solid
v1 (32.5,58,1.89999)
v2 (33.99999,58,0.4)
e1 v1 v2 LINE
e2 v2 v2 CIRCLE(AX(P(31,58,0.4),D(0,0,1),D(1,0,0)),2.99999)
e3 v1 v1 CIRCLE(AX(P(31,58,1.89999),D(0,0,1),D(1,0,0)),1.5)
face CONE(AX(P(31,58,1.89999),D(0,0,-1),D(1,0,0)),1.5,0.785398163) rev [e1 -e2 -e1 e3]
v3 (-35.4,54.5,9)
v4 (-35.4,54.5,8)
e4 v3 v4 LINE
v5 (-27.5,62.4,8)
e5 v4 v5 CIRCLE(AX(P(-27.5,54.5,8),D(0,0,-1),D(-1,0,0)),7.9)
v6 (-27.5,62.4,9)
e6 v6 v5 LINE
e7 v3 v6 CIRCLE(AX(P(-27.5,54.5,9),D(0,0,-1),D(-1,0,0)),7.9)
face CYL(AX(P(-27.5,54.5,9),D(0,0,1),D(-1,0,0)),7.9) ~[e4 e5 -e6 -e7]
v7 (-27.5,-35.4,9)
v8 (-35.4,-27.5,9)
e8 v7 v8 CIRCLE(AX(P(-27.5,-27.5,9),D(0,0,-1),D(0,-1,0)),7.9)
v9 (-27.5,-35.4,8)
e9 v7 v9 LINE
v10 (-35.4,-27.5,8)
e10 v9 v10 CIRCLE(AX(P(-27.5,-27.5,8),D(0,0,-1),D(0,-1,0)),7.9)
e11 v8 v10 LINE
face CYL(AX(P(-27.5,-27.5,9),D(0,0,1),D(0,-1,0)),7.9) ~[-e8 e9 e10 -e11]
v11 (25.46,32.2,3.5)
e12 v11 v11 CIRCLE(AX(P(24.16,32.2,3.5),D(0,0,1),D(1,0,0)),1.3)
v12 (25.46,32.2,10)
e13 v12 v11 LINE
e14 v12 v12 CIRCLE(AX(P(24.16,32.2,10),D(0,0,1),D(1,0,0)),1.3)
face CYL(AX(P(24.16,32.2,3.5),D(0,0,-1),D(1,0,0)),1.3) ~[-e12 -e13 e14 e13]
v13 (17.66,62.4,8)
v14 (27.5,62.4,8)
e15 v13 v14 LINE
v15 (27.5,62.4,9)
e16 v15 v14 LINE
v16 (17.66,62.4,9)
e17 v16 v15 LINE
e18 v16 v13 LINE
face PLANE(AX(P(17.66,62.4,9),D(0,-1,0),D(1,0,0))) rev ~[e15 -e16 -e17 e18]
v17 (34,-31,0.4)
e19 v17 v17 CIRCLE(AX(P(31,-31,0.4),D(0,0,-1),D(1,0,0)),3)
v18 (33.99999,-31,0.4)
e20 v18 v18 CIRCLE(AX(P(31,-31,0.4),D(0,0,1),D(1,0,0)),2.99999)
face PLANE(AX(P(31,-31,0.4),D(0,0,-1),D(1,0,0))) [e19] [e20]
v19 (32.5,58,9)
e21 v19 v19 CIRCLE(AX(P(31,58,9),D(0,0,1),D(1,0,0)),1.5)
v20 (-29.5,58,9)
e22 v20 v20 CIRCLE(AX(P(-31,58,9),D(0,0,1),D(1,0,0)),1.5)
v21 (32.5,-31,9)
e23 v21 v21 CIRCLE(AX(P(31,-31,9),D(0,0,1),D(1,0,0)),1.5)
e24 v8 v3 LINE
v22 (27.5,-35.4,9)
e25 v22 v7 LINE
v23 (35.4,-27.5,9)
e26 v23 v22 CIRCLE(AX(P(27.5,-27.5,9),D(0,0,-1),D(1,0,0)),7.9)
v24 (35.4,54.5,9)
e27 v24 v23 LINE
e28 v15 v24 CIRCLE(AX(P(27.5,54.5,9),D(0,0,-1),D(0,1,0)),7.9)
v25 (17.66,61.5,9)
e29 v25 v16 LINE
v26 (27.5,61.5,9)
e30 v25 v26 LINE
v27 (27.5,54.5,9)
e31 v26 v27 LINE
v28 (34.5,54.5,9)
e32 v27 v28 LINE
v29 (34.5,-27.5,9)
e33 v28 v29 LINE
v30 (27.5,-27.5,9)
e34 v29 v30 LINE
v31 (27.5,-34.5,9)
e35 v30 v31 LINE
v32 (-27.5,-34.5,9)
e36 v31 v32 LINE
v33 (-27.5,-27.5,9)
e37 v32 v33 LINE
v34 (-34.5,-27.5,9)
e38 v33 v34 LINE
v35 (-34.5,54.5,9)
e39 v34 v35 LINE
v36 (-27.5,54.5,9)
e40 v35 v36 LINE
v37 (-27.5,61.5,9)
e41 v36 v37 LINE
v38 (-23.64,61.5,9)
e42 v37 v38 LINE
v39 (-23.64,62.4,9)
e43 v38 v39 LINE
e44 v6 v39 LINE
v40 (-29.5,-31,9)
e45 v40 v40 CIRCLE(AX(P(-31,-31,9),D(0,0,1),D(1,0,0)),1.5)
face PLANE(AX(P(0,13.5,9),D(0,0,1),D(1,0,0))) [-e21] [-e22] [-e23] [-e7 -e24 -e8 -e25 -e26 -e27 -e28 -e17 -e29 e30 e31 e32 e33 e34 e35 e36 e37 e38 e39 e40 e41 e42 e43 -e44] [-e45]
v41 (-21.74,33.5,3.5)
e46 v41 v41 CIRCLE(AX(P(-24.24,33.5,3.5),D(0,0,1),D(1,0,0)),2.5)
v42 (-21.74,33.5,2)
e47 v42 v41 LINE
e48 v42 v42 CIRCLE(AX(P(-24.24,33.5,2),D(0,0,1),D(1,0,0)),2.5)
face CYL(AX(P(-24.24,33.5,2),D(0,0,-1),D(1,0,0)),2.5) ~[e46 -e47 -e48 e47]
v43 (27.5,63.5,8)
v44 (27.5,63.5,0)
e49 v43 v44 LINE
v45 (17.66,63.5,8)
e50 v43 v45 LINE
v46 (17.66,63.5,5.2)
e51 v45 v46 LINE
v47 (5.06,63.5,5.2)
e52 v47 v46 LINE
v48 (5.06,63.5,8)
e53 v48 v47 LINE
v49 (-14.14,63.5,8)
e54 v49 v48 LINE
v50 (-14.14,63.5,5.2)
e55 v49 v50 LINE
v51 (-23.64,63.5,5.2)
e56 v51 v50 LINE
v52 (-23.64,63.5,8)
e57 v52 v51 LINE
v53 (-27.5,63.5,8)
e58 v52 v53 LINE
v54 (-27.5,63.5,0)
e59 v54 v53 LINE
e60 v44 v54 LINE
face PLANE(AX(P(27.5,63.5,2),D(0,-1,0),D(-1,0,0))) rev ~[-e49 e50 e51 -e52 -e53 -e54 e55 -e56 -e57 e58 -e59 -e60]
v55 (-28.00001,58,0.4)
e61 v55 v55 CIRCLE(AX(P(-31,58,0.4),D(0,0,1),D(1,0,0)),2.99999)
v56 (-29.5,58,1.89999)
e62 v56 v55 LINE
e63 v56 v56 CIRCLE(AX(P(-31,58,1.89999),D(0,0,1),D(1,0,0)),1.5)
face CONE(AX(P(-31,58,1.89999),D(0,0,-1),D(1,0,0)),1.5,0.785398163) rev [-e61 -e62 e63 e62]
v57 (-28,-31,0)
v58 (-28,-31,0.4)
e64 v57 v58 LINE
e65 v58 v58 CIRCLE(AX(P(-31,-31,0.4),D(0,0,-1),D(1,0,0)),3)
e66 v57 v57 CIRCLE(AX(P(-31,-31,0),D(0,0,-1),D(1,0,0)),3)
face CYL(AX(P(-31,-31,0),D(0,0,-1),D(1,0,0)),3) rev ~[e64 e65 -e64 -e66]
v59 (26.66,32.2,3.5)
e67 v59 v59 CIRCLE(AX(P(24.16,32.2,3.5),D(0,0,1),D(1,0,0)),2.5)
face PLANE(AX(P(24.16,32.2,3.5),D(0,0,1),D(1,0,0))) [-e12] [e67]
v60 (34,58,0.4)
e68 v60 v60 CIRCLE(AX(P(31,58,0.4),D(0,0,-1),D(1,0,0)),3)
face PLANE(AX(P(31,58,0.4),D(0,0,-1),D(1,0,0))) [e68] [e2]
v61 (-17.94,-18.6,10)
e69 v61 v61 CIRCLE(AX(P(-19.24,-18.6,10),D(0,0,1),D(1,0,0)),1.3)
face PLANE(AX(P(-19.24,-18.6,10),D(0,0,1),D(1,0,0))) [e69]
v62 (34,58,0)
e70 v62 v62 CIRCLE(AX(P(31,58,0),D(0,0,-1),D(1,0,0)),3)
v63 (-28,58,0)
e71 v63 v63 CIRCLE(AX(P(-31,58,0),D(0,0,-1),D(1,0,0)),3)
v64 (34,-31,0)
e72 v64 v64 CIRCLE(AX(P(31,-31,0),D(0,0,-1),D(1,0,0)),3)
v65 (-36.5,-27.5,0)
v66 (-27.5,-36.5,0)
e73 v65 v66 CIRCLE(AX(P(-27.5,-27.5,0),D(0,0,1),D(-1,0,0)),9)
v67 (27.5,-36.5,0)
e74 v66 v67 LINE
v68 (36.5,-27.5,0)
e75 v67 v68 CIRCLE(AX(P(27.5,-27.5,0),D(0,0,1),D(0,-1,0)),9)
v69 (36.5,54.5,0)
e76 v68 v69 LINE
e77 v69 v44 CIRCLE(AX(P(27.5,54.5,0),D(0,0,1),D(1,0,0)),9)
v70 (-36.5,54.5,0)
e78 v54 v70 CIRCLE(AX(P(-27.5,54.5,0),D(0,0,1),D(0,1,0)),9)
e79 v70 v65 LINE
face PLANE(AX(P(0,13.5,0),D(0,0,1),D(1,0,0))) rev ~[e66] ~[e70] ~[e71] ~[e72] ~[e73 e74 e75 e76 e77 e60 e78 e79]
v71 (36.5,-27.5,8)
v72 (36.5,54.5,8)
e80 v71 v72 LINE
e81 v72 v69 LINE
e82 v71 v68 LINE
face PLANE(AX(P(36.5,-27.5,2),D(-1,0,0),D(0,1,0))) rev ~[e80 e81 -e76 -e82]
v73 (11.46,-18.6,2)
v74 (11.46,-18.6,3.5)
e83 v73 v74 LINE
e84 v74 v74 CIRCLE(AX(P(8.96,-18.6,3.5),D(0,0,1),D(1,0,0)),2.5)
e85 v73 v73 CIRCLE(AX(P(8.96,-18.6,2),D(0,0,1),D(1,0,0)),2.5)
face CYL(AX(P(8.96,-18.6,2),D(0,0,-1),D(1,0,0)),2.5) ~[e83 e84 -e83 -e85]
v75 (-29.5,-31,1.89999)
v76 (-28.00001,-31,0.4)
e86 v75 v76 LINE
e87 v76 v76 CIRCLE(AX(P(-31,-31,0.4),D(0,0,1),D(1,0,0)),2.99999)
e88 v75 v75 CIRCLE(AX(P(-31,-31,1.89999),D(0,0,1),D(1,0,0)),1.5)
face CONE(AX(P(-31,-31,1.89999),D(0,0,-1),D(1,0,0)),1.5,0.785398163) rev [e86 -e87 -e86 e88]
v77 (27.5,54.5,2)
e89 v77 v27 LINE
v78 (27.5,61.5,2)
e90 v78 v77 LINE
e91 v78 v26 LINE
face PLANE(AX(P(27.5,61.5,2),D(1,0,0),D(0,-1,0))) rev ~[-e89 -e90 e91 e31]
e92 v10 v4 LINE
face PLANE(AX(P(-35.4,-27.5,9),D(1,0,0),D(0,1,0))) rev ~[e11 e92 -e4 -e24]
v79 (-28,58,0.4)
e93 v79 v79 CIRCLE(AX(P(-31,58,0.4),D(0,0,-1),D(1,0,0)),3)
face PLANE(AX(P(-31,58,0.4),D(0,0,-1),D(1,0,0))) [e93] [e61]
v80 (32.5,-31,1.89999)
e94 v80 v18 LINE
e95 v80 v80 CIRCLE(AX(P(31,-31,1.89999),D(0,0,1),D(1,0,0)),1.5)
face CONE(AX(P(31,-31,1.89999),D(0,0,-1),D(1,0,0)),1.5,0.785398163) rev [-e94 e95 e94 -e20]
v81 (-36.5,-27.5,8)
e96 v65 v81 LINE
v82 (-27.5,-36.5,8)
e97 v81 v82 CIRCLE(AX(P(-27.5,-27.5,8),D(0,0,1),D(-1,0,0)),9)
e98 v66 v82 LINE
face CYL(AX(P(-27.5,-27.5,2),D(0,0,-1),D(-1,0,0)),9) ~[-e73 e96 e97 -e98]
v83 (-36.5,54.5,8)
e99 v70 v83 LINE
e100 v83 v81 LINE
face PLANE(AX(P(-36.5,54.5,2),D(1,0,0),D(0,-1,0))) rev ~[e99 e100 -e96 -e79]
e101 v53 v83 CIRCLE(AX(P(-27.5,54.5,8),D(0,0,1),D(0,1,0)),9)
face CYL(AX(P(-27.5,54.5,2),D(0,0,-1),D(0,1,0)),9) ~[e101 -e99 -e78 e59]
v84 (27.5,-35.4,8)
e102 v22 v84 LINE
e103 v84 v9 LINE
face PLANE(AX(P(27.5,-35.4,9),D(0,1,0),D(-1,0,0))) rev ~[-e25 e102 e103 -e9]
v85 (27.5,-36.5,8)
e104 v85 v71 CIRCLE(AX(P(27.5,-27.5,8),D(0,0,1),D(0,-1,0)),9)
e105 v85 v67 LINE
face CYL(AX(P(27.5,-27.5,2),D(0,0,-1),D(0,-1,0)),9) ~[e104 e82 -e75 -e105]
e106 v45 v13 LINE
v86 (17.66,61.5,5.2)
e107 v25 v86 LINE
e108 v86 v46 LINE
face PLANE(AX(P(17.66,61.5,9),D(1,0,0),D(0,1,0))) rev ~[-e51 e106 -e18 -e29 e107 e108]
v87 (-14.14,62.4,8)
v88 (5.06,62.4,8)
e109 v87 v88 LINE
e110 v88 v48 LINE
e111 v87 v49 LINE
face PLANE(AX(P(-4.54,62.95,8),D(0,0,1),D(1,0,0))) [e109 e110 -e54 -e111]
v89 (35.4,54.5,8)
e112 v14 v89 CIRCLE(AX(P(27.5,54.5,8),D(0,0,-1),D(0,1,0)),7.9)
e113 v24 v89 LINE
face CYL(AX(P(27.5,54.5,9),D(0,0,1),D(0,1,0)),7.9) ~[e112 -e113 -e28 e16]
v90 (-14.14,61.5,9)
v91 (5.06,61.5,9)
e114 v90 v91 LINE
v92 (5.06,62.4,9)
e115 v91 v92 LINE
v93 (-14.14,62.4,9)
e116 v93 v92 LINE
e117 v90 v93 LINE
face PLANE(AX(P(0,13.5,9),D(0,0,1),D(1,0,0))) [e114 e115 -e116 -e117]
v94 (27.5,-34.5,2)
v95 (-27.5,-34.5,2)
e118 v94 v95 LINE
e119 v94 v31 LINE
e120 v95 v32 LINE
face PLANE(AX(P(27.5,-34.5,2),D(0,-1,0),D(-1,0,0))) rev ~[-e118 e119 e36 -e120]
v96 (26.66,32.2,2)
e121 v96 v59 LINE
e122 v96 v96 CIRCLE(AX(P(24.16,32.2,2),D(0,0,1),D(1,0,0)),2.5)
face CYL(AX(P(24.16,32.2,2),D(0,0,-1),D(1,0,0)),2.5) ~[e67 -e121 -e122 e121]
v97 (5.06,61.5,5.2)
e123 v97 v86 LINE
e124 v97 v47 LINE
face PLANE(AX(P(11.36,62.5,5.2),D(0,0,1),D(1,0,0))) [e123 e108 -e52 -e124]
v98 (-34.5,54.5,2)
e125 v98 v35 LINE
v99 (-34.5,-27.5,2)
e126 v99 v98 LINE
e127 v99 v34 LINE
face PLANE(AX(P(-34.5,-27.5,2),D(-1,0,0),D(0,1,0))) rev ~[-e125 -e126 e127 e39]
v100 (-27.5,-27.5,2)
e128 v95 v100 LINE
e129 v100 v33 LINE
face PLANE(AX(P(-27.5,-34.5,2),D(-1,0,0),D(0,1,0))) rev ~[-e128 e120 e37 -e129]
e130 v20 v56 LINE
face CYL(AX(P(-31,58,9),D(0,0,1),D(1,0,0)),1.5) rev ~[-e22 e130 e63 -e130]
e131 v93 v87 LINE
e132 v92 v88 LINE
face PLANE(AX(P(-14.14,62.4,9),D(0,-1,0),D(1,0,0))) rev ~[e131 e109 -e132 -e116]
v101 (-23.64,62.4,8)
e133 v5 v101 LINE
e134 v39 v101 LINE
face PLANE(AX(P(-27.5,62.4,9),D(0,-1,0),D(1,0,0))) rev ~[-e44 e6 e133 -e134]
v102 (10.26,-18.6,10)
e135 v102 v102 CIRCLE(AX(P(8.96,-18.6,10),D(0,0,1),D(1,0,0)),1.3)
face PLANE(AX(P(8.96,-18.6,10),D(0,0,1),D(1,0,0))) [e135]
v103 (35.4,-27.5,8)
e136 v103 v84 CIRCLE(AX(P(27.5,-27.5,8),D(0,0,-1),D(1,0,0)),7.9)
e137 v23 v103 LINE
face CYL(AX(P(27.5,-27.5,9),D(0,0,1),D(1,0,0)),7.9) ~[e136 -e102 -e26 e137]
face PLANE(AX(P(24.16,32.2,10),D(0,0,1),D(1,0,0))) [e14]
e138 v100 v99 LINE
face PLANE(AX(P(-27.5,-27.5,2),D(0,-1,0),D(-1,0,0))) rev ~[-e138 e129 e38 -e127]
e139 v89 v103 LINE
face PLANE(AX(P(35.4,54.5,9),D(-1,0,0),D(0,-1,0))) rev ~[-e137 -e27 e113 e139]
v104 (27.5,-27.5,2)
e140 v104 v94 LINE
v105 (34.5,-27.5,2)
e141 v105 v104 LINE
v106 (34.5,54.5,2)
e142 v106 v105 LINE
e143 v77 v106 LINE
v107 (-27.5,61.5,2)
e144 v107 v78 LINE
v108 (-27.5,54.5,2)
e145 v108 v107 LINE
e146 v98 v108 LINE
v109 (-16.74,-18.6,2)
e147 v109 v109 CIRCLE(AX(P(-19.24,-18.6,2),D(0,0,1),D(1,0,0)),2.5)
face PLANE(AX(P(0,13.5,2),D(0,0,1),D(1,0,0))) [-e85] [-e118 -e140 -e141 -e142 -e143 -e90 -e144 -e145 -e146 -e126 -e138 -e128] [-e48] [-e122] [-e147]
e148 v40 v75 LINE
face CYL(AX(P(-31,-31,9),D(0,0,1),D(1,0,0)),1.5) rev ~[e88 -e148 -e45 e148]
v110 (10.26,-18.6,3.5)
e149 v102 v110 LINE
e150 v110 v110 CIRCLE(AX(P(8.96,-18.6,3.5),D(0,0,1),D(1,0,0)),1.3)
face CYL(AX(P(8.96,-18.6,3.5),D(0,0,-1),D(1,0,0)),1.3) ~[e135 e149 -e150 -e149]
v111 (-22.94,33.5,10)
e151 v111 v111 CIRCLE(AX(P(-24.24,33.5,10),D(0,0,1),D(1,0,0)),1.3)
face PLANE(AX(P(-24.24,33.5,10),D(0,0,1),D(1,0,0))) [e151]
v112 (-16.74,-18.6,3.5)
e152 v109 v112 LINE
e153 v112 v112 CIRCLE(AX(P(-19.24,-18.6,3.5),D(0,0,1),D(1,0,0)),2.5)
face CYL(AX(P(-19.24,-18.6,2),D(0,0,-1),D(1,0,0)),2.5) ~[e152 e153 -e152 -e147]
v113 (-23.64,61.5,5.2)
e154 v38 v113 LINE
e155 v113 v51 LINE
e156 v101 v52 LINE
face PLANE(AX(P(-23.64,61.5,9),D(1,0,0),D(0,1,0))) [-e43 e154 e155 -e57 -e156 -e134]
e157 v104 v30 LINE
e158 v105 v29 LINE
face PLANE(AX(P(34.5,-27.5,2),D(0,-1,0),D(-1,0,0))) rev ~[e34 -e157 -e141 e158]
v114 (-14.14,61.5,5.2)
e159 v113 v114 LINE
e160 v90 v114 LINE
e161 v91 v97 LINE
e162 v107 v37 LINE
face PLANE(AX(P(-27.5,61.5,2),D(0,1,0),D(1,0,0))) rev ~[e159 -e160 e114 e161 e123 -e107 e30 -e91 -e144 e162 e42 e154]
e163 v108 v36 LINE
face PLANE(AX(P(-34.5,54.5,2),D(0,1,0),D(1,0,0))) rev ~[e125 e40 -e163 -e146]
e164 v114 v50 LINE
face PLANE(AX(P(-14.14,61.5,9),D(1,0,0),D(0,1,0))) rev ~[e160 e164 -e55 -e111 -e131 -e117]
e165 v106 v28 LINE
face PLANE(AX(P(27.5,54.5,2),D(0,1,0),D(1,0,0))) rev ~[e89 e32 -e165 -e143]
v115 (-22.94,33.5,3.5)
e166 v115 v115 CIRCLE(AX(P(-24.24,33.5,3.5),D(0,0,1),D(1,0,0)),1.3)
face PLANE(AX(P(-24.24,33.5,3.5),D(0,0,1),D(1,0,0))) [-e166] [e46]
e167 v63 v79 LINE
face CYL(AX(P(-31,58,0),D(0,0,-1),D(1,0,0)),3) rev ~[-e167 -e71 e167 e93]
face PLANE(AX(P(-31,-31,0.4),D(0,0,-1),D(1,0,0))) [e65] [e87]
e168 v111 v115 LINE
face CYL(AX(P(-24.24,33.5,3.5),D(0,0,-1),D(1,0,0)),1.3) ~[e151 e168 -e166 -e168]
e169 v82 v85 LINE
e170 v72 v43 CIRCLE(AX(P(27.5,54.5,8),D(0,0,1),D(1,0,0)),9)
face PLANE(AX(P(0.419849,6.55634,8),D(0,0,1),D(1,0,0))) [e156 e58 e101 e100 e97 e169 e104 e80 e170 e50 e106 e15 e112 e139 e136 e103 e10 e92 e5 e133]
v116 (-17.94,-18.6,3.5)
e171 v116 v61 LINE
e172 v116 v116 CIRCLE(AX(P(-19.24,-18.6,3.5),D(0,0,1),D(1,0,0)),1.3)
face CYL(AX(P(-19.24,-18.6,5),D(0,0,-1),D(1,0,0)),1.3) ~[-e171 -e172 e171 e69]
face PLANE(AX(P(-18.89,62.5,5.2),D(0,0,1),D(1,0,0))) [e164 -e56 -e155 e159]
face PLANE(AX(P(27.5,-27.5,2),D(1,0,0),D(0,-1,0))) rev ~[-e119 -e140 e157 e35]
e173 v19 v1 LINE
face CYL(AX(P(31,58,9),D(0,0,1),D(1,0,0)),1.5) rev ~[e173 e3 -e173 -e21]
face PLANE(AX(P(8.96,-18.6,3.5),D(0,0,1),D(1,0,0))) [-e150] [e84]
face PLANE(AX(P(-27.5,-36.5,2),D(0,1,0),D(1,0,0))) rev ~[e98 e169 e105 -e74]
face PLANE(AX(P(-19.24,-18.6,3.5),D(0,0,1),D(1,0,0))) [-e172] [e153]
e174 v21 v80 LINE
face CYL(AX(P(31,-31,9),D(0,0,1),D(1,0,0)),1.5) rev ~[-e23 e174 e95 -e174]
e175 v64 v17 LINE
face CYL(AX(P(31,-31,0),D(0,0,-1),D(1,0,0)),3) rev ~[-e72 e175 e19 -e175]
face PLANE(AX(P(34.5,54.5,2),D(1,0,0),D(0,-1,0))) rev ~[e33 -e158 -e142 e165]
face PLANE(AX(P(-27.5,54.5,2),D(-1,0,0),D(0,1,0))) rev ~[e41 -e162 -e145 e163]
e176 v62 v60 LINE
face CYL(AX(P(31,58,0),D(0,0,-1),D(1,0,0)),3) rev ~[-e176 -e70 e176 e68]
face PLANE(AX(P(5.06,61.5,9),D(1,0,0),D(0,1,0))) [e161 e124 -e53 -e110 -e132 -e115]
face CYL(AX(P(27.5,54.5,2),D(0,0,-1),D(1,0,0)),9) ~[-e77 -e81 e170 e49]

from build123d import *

# Parameters (mm, degrees)
F1_DEPTH  = 2
F2_R      = 2.5
F3_DEPTH  = 1.5
F4_R      = 1.3
F5_DEPTH  = 1.5
F7_DEPTH  = 7
F8_R      = 1.5
F9_DEPTH  = 10
F10_W     = 12.6
F10_H     = 2
F10_W_2   = 9.5
F11_DEPTH = 3.8
F12_R     = 3
F13_DEPTH = 0.4
F14_SIZE  = 1.49999
F15_W     = 19.2
F15_H     = 1.1
F16_DEPTH = 1
F17_DEPTH = 5


# Not quite as in the source:
# - a fillet or chamfer is up to 0.001 mm smaller than in the source, because OpenCascade refuses the exact size


with BuildPart() as f1:
    # F0 (on Top) → F1 (new body)
    with BuildSketch(Plane.XY):
        with BuildLine():
            Line((27.5, 63.5), (-27.5, 63.5))
            ThreePointArc((-27.5, 63.5), (-33.8639610307, 60.8639610307), (-36.5, 54.5))
            Line((-36.5, 54.5), (-36.5, -27.5))
            ThreePointArc((-36.5, -27.5), (-33.8639610307, -33.8639610307), (-27.5, -36.5))
            Line((-27.5, -36.5), (27.5, -36.5))
            ThreePointArc((27.5, -36.5), (33.8639610307, -33.8639610307), (36.5, -27.5))
            Line((36.5, -27.5), (36.5, 54.5))
            ThreePointArc((36.5, 54.5), (33.8639610307, 60.8639610307), (27.5, 63.5))
        make_face()
    extrude(amount=F1_DEPTH)

    # F2 (on face) → F3 (join)
    with BuildSketch(Plane.XY.offset(2)):
        with Locations((-19.24, -18.6)):
            Circle(F2_R)
        with Locations((8.96, -18.6)):
            Circle(F2_R)
        with Locations((24.16, 32.2)):
            Circle(F2_R)
        with Locations((-24.24, 33.5)):
            Circle(F2_R)
    extrude(amount=F3_DEPTH)

    # F4 (on face) → F5 (join)
    with BuildSketch(Plane.XY.offset(3.5)):
        with Locations((-19.24, -18.6)):
            Circle(F4_R)
        with Locations((8.96, -18.6)):
            Circle(F4_R)
        with Locations((24.16, 32.2)):
            Circle(F4_R)
        with Locations((-24.24, 33.5)):
            Circle(F4_R)
    extrude(amount=F5_DEPTH)

    # F6 (on face) → F7 (join)
    with BuildSketch(Plane.XY.offset(2)):
        with BuildLine():
            Line((27.5, 63.5), (-27.5, 63.5))
            ThreePointArc((-27.5, 63.5), (-33.8639610307, 60.8639610307), (-36.5, 54.5))
            Line((-36.5, 54.5), (-36.5, -27.5))
            ThreePointArc((-36.5, -27.5), (-33.8639610307, -33.8639610307), (-27.5, -36.5))
            Line((-27.5, -36.5), (27.5, -36.5))
            ThreePointArc((27.5, -36.5), (33.8639610307, -33.8639610307), (36.5, -27.5))
            Line((36.5, -27.5), (36.5, 54.5))
            ThreePointArc((36.5, 54.5), (33.8639610307, 60.8639610307), (27.5, 63.5))
        make_face()
        Polygon((-27.5, 54.5), (-27.5, 61.5), (27.5, 61.5), (27.5, 54.5), (34.5, 54.5), (34.5, -27.5), (27.5, -27.5), (27.5, -34.5), (-27.5, -34.5), (-27.5, -27.5), (-34.5, -27.5), (-34.5, 54.5), align=None, mode=Mode.SUBTRACT)
    extrude(amount=F7_DEPTH)

    # F8 (on face) → F9 (cut)
    with BuildSketch(Plane.XY.offset(9)):
        with Locations((-31, 58)):
            Circle(F8_R)
        with Locations((31, 58)):
            Circle(F8_R)
        with Locations((-31, -31)):
            Circle(F8_R)
        with Locations((31, -31)):
            Circle(F8_R)
    extrude(amount=-F9_DEPTH, mode=Mode.SUBTRACT)

    # F10 (on face) → F11 (cut)
    with BuildSketch(Plane.XY.offset(9)):
        with Locations((11.36, 62.5)):
            Rectangle(F10_W, F10_H)
        with Locations((-18.89, 62.5)):
            Rectangle(F10_W_2, F10_H)
    extrude(amount=-F11_DEPTH, mode=Mode.SUBTRACT)

    # F12 (on face) → F13 (cut)
    with BuildSketch(Plane(origin=(0, 0, 0), x_dir=(1, 0, 0), z_dir=(0, 0, -1))):
        with Locations((31, -58)):
            Circle(F12_R)
        with Locations((-31, -58)):
            Circle(F12_R)
        with Locations((-31, 31)):
            Circle(F12_R)
        with Locations((31, 31)):
            Circle(F12_R)
    extrude(amount=-F13_DEPTH, mode=Mode.SUBTRACT)

    # F14 (size 1.5 in the source; OpenCascade refuses exactly that, so slightly less here)
    f14_edges = [f1.edges().sort_by_distance(p)[0] for p in [
        (29.5, 58, 0.4),
        (-32.5, 58, 0.4),
        (29.5, -31, 0.4),
        (-32.5, -31, 0.4),
    ]]
    chamfer(f14_edges, length=F14_SIZE)

    # F15 (on face) → F16 (cut)
    with BuildSketch(Plane.XY.offset(9)):
        with BuildLine():
            Line((-23.64, 63.5), (-27.5, 63.5))
            ThreePointArc((-27.5, 63.5), (-33.8639610307, 60.8639610307), (-36.5, 54.5))
            Line((-36.5, 54.5), (-36.5, -27.5))
            ThreePointArc((-36.5, -27.5), (-33.8639610307, -33.8639610307), (-27.5, -36.5))
            Line((-27.5, -36.5), (27.5, -36.5))
            ThreePointArc((27.5, -36.5), (33.8639610307, -33.8639610307), (36.5, -27.5))
            Line((36.5, -27.5), (36.5, 54.5))
            ThreePointArc((36.5, 54.5), (33.8639610307, 60.8639610307), (27.5, 63.5))
            Line((27.5, 63.5), (17.66, 63.5))
            Line((17.66, 63.5), (17.66, 62.4))
            Line((17.66, 62.4), (27.5, 62.4))
            ThreePointArc((27.5, 62.4), (33.0861435714, 60.0861435714), (35.4, 54.5))
            Line((35.4, 54.5), (35.4, -27.5))
            ThreePointArc((35.4, -27.5), (33.0861435714, -33.0861435714), (27.5, -35.4))
            Line((27.5, -35.4), (-27.5, -35.4))
            ThreePointArc((-27.5, -35.4), (-33.0861435714, -33.0861435714), (-35.4, -27.5))
            Line((-35.4, -27.5), (-35.4, 54.5))
            ThreePointArc((-35.4, 54.5), (-33.0861435714, 60.0861435714), (-27.5, 62.4))
            Line((-27.5, 62.4), (-23.64, 62.4))
            Line((-23.64, 62.4), (-23.64, 63.5))
        make_face()
        with Locations((-4.54, 62.95)):
            Rectangle(F15_W, F15_H)
    extrude(amount=-F16_DEPTH, mode=Mode.SUBTRACT)

    # F17 (add): faces of the model
    f17_faces = [f1.faces().sort_by_distance(p)[0] for p in [
        (-19.24, -18.6, 5),
        (8.96, -18.6, 5),
        (24.16, 32.2, 5),
        (-24.24, 33.5, 5),
    ]]
    extrude(f17_faces, amount=F17_DEPTH)


solid = f1.part
